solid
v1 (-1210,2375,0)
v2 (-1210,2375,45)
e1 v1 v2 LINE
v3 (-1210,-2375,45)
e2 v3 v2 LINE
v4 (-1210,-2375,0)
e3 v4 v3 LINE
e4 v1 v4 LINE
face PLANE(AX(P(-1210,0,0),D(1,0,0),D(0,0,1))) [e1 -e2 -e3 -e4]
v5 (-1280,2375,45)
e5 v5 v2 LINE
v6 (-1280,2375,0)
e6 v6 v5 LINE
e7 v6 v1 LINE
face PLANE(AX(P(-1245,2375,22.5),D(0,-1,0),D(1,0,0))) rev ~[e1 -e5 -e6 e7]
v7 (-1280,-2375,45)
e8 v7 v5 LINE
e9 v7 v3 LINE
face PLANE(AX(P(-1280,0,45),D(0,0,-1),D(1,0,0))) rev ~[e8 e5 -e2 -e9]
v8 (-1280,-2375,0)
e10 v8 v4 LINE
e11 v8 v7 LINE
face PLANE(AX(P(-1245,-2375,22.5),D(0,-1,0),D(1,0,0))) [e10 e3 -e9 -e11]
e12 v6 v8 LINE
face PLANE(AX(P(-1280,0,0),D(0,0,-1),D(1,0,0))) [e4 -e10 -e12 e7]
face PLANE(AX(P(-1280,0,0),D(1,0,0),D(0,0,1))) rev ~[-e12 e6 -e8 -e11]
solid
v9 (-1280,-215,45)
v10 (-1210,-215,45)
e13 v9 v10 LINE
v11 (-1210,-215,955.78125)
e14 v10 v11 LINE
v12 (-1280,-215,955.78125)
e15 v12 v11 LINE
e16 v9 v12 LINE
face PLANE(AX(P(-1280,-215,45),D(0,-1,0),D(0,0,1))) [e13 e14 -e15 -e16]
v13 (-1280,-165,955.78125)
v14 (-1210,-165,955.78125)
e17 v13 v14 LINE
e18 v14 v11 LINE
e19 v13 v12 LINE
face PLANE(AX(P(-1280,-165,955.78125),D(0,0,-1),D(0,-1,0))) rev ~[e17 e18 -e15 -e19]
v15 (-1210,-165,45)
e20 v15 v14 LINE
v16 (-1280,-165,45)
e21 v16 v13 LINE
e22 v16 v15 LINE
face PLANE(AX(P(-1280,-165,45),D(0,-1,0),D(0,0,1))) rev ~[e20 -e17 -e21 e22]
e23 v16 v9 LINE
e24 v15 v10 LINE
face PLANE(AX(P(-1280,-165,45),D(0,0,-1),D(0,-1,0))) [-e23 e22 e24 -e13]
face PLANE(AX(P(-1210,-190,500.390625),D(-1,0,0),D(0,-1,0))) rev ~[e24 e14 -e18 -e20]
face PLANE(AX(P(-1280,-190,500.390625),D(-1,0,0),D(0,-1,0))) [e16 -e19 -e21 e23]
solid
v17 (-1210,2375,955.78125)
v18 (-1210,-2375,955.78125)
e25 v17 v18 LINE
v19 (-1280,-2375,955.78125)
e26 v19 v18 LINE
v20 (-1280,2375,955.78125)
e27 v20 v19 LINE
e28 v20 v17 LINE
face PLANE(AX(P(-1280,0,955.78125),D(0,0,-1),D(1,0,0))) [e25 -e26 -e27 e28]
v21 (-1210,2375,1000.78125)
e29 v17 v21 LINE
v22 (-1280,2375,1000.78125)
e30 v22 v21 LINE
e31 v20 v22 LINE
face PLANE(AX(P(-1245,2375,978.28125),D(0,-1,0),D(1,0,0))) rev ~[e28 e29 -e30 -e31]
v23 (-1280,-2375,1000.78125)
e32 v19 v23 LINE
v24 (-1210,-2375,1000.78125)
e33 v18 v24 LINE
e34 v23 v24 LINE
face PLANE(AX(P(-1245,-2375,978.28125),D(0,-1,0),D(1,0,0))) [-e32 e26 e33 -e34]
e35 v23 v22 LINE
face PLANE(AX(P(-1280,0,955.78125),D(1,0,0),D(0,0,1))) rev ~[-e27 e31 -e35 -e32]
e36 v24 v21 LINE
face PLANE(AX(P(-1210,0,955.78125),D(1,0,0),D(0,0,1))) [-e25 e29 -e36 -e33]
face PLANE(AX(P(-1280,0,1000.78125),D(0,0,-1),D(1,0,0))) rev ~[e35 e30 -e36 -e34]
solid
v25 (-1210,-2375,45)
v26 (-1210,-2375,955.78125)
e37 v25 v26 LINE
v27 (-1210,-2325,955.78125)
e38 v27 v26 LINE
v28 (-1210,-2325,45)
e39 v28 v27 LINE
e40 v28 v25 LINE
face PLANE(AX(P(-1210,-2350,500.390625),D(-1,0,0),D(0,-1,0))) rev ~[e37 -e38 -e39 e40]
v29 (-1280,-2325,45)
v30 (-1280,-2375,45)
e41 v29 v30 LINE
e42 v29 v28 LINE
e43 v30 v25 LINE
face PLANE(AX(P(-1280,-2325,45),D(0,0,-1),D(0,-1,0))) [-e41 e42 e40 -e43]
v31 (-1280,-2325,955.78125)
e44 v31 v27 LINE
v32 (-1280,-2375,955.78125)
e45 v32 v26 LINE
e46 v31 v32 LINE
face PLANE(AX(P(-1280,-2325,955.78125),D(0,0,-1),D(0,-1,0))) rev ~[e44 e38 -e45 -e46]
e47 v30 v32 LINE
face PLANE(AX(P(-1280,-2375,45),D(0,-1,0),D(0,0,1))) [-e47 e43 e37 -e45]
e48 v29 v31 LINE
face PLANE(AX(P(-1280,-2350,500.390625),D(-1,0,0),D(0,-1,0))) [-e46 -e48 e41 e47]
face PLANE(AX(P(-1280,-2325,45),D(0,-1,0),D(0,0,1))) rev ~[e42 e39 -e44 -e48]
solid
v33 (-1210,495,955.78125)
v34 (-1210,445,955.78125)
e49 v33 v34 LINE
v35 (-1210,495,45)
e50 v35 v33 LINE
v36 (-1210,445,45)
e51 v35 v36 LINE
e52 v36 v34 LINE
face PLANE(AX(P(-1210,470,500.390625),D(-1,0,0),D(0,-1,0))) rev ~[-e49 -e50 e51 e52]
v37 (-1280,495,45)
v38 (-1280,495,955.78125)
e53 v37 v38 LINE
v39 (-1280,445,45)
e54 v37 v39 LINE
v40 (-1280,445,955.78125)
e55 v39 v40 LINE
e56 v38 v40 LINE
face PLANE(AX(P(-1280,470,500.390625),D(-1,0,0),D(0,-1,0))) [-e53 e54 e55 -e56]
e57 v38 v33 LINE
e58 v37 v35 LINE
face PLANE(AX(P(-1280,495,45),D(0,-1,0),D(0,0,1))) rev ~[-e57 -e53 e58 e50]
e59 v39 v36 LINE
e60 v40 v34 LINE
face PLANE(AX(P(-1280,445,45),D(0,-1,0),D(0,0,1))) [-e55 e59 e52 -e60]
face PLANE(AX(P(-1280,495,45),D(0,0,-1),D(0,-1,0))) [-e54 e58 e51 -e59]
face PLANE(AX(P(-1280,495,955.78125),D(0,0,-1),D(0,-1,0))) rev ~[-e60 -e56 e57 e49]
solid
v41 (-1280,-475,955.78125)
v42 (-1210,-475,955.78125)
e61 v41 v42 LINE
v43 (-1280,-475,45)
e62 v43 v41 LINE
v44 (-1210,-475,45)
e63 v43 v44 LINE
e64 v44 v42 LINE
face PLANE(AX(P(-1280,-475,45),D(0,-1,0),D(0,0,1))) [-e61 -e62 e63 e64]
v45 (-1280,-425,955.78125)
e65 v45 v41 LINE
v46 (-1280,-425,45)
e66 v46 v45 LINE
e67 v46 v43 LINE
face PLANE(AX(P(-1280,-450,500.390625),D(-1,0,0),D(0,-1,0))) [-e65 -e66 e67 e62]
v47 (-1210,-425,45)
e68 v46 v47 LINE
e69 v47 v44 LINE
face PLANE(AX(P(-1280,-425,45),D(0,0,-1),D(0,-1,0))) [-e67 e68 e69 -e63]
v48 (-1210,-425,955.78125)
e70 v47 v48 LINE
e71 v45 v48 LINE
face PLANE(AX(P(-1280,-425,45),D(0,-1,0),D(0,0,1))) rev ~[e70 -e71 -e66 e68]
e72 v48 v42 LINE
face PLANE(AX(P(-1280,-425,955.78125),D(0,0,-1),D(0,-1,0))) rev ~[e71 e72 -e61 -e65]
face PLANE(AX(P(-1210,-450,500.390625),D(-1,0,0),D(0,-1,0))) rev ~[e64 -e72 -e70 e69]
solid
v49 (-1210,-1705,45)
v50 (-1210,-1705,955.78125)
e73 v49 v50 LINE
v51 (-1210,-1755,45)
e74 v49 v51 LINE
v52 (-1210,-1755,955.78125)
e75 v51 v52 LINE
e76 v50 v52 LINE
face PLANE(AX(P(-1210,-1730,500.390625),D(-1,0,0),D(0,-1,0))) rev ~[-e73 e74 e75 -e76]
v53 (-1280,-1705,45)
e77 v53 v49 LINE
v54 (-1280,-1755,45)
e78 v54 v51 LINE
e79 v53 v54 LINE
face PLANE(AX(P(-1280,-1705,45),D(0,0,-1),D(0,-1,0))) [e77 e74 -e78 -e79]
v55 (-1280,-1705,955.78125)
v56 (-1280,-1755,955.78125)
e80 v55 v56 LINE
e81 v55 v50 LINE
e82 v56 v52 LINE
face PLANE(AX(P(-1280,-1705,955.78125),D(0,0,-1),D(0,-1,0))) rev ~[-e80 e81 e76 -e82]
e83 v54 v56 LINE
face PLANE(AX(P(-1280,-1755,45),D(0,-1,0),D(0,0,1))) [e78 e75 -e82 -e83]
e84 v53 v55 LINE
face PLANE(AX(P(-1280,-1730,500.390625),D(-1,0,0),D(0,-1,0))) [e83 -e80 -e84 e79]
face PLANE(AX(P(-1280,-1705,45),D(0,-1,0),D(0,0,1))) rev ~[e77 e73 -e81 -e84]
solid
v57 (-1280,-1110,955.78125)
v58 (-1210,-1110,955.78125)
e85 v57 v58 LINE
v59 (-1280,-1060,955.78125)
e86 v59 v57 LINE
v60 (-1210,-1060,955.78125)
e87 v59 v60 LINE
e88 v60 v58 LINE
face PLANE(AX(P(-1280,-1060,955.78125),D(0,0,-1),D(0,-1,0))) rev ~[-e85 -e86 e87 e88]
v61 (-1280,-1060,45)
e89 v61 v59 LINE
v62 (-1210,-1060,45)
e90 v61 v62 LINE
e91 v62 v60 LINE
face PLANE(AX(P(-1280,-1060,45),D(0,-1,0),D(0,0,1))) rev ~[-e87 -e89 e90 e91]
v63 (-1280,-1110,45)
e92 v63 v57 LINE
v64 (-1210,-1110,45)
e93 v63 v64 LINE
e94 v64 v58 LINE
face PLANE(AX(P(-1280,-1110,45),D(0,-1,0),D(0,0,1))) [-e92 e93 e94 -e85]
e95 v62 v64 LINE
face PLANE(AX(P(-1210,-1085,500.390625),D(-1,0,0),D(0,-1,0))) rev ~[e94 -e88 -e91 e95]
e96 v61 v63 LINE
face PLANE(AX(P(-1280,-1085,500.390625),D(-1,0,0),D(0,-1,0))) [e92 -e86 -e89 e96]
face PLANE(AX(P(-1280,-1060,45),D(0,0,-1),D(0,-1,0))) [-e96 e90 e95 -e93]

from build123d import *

# Parameters (mm, degrees)
F2_W     = 70
F2_H     = 45
F3_DEPTH = 2375
F4_W     = 50
F4_H     = 910.78125
F5_DEPTH = 70


with BuildPart() as f3:
    # F2 (on Front) → F3 (new body, symmetric)
    with BuildSketch(Plane.XZ):
        with Locations((-1245, 22.5)):
            Rectangle(F2_W, F2_H)
    extrude(amount=F3_DEPTH, both=True)


with BuildPart() as f3b:
    # F2 (on Front) → F3, piece 2 (new body, symmetric)
    with BuildSketch(Plane.XZ):
        with Locations((-1245, 978.28125)):
            Rectangle(F2_W, F2_H)
    extrude(amount=F3_DEPTH, both=True)


with BuildPart() as f5:
    # F4 (on face) → F5 (new body, through all)
    with BuildSketch(Plane(origin=(-1280, 0, 0), x_dir=(0, -1, 0), z_dir=(-1, 0, 0))):
        with Locations((2350, 500.390625)):
            Rectangle(F4_W, F4_H)
    extrude(amount=-F5_DEPTH)


with BuildPart() as f5b:
    # F4 (on face) → F5, piece 2 (new body, through all)
    with BuildSketch(Plane(origin=(-1280, 0, 0), x_dir=(0, -1, 0), z_dir=(-1, 0, 0))):
        with Locations((1730, 500.390625)):
            Rectangle(F4_W, F4_H)
    extrude(amount=-F5_DEPTH)


with BuildPart() as f5c:
    # F4 (on face) → F5, piece 3 (new body, through all)
    with BuildSketch(Plane(origin=(-1280, 0, 0), x_dir=(0, -1, 0), z_dir=(-1, 0, 0))):
        with Locations((1085, 500.390625)):
            Rectangle(F4_W, F4_H)
    extrude(amount=-F5_DEPTH)


with BuildPart() as f5d:
    # F4 (on face) → F5, piece 4 (new body, through all)
    with BuildSketch(Plane(origin=(-1280, 0, 0), x_dir=(0, -1, 0), z_dir=(-1, 0, 0))):
        with Locations((450, 500.390625)):
            Rectangle(F4_W, F4_H)
    extrude(amount=-F5_DEPTH)


with BuildPart() as f5e:
    # F4 (on face) → F5, piece 5 (new body, through all)
    with BuildSketch(Plane(origin=(-1280, 0, 0), x_dir=(0, -1, 0), z_dir=(-1, 0, 0))):
        with Locations((190, 500.390625)):
            Rectangle(F4_W, F4_H)
    extrude(amount=-F5_DEPTH)


with BuildPart() as f5f:
    # F4 (on face) → F5, piece 6 (new body, through all)
    with BuildSketch(Plane(origin=(-1280, 0, 0), x_dir=(0, -1, 0), z_dir=(-1, 0, 0))):
        with Locations((-470, 500.390625)):
            Rectangle(F4_W, F4_H)
    extrude(amount=-F5_DEPTH)


solid = Compound([f3.part, f3b.part, f5.part, f5b.part, f5c.part, f5d.part, f5e.part, f5f.part])
